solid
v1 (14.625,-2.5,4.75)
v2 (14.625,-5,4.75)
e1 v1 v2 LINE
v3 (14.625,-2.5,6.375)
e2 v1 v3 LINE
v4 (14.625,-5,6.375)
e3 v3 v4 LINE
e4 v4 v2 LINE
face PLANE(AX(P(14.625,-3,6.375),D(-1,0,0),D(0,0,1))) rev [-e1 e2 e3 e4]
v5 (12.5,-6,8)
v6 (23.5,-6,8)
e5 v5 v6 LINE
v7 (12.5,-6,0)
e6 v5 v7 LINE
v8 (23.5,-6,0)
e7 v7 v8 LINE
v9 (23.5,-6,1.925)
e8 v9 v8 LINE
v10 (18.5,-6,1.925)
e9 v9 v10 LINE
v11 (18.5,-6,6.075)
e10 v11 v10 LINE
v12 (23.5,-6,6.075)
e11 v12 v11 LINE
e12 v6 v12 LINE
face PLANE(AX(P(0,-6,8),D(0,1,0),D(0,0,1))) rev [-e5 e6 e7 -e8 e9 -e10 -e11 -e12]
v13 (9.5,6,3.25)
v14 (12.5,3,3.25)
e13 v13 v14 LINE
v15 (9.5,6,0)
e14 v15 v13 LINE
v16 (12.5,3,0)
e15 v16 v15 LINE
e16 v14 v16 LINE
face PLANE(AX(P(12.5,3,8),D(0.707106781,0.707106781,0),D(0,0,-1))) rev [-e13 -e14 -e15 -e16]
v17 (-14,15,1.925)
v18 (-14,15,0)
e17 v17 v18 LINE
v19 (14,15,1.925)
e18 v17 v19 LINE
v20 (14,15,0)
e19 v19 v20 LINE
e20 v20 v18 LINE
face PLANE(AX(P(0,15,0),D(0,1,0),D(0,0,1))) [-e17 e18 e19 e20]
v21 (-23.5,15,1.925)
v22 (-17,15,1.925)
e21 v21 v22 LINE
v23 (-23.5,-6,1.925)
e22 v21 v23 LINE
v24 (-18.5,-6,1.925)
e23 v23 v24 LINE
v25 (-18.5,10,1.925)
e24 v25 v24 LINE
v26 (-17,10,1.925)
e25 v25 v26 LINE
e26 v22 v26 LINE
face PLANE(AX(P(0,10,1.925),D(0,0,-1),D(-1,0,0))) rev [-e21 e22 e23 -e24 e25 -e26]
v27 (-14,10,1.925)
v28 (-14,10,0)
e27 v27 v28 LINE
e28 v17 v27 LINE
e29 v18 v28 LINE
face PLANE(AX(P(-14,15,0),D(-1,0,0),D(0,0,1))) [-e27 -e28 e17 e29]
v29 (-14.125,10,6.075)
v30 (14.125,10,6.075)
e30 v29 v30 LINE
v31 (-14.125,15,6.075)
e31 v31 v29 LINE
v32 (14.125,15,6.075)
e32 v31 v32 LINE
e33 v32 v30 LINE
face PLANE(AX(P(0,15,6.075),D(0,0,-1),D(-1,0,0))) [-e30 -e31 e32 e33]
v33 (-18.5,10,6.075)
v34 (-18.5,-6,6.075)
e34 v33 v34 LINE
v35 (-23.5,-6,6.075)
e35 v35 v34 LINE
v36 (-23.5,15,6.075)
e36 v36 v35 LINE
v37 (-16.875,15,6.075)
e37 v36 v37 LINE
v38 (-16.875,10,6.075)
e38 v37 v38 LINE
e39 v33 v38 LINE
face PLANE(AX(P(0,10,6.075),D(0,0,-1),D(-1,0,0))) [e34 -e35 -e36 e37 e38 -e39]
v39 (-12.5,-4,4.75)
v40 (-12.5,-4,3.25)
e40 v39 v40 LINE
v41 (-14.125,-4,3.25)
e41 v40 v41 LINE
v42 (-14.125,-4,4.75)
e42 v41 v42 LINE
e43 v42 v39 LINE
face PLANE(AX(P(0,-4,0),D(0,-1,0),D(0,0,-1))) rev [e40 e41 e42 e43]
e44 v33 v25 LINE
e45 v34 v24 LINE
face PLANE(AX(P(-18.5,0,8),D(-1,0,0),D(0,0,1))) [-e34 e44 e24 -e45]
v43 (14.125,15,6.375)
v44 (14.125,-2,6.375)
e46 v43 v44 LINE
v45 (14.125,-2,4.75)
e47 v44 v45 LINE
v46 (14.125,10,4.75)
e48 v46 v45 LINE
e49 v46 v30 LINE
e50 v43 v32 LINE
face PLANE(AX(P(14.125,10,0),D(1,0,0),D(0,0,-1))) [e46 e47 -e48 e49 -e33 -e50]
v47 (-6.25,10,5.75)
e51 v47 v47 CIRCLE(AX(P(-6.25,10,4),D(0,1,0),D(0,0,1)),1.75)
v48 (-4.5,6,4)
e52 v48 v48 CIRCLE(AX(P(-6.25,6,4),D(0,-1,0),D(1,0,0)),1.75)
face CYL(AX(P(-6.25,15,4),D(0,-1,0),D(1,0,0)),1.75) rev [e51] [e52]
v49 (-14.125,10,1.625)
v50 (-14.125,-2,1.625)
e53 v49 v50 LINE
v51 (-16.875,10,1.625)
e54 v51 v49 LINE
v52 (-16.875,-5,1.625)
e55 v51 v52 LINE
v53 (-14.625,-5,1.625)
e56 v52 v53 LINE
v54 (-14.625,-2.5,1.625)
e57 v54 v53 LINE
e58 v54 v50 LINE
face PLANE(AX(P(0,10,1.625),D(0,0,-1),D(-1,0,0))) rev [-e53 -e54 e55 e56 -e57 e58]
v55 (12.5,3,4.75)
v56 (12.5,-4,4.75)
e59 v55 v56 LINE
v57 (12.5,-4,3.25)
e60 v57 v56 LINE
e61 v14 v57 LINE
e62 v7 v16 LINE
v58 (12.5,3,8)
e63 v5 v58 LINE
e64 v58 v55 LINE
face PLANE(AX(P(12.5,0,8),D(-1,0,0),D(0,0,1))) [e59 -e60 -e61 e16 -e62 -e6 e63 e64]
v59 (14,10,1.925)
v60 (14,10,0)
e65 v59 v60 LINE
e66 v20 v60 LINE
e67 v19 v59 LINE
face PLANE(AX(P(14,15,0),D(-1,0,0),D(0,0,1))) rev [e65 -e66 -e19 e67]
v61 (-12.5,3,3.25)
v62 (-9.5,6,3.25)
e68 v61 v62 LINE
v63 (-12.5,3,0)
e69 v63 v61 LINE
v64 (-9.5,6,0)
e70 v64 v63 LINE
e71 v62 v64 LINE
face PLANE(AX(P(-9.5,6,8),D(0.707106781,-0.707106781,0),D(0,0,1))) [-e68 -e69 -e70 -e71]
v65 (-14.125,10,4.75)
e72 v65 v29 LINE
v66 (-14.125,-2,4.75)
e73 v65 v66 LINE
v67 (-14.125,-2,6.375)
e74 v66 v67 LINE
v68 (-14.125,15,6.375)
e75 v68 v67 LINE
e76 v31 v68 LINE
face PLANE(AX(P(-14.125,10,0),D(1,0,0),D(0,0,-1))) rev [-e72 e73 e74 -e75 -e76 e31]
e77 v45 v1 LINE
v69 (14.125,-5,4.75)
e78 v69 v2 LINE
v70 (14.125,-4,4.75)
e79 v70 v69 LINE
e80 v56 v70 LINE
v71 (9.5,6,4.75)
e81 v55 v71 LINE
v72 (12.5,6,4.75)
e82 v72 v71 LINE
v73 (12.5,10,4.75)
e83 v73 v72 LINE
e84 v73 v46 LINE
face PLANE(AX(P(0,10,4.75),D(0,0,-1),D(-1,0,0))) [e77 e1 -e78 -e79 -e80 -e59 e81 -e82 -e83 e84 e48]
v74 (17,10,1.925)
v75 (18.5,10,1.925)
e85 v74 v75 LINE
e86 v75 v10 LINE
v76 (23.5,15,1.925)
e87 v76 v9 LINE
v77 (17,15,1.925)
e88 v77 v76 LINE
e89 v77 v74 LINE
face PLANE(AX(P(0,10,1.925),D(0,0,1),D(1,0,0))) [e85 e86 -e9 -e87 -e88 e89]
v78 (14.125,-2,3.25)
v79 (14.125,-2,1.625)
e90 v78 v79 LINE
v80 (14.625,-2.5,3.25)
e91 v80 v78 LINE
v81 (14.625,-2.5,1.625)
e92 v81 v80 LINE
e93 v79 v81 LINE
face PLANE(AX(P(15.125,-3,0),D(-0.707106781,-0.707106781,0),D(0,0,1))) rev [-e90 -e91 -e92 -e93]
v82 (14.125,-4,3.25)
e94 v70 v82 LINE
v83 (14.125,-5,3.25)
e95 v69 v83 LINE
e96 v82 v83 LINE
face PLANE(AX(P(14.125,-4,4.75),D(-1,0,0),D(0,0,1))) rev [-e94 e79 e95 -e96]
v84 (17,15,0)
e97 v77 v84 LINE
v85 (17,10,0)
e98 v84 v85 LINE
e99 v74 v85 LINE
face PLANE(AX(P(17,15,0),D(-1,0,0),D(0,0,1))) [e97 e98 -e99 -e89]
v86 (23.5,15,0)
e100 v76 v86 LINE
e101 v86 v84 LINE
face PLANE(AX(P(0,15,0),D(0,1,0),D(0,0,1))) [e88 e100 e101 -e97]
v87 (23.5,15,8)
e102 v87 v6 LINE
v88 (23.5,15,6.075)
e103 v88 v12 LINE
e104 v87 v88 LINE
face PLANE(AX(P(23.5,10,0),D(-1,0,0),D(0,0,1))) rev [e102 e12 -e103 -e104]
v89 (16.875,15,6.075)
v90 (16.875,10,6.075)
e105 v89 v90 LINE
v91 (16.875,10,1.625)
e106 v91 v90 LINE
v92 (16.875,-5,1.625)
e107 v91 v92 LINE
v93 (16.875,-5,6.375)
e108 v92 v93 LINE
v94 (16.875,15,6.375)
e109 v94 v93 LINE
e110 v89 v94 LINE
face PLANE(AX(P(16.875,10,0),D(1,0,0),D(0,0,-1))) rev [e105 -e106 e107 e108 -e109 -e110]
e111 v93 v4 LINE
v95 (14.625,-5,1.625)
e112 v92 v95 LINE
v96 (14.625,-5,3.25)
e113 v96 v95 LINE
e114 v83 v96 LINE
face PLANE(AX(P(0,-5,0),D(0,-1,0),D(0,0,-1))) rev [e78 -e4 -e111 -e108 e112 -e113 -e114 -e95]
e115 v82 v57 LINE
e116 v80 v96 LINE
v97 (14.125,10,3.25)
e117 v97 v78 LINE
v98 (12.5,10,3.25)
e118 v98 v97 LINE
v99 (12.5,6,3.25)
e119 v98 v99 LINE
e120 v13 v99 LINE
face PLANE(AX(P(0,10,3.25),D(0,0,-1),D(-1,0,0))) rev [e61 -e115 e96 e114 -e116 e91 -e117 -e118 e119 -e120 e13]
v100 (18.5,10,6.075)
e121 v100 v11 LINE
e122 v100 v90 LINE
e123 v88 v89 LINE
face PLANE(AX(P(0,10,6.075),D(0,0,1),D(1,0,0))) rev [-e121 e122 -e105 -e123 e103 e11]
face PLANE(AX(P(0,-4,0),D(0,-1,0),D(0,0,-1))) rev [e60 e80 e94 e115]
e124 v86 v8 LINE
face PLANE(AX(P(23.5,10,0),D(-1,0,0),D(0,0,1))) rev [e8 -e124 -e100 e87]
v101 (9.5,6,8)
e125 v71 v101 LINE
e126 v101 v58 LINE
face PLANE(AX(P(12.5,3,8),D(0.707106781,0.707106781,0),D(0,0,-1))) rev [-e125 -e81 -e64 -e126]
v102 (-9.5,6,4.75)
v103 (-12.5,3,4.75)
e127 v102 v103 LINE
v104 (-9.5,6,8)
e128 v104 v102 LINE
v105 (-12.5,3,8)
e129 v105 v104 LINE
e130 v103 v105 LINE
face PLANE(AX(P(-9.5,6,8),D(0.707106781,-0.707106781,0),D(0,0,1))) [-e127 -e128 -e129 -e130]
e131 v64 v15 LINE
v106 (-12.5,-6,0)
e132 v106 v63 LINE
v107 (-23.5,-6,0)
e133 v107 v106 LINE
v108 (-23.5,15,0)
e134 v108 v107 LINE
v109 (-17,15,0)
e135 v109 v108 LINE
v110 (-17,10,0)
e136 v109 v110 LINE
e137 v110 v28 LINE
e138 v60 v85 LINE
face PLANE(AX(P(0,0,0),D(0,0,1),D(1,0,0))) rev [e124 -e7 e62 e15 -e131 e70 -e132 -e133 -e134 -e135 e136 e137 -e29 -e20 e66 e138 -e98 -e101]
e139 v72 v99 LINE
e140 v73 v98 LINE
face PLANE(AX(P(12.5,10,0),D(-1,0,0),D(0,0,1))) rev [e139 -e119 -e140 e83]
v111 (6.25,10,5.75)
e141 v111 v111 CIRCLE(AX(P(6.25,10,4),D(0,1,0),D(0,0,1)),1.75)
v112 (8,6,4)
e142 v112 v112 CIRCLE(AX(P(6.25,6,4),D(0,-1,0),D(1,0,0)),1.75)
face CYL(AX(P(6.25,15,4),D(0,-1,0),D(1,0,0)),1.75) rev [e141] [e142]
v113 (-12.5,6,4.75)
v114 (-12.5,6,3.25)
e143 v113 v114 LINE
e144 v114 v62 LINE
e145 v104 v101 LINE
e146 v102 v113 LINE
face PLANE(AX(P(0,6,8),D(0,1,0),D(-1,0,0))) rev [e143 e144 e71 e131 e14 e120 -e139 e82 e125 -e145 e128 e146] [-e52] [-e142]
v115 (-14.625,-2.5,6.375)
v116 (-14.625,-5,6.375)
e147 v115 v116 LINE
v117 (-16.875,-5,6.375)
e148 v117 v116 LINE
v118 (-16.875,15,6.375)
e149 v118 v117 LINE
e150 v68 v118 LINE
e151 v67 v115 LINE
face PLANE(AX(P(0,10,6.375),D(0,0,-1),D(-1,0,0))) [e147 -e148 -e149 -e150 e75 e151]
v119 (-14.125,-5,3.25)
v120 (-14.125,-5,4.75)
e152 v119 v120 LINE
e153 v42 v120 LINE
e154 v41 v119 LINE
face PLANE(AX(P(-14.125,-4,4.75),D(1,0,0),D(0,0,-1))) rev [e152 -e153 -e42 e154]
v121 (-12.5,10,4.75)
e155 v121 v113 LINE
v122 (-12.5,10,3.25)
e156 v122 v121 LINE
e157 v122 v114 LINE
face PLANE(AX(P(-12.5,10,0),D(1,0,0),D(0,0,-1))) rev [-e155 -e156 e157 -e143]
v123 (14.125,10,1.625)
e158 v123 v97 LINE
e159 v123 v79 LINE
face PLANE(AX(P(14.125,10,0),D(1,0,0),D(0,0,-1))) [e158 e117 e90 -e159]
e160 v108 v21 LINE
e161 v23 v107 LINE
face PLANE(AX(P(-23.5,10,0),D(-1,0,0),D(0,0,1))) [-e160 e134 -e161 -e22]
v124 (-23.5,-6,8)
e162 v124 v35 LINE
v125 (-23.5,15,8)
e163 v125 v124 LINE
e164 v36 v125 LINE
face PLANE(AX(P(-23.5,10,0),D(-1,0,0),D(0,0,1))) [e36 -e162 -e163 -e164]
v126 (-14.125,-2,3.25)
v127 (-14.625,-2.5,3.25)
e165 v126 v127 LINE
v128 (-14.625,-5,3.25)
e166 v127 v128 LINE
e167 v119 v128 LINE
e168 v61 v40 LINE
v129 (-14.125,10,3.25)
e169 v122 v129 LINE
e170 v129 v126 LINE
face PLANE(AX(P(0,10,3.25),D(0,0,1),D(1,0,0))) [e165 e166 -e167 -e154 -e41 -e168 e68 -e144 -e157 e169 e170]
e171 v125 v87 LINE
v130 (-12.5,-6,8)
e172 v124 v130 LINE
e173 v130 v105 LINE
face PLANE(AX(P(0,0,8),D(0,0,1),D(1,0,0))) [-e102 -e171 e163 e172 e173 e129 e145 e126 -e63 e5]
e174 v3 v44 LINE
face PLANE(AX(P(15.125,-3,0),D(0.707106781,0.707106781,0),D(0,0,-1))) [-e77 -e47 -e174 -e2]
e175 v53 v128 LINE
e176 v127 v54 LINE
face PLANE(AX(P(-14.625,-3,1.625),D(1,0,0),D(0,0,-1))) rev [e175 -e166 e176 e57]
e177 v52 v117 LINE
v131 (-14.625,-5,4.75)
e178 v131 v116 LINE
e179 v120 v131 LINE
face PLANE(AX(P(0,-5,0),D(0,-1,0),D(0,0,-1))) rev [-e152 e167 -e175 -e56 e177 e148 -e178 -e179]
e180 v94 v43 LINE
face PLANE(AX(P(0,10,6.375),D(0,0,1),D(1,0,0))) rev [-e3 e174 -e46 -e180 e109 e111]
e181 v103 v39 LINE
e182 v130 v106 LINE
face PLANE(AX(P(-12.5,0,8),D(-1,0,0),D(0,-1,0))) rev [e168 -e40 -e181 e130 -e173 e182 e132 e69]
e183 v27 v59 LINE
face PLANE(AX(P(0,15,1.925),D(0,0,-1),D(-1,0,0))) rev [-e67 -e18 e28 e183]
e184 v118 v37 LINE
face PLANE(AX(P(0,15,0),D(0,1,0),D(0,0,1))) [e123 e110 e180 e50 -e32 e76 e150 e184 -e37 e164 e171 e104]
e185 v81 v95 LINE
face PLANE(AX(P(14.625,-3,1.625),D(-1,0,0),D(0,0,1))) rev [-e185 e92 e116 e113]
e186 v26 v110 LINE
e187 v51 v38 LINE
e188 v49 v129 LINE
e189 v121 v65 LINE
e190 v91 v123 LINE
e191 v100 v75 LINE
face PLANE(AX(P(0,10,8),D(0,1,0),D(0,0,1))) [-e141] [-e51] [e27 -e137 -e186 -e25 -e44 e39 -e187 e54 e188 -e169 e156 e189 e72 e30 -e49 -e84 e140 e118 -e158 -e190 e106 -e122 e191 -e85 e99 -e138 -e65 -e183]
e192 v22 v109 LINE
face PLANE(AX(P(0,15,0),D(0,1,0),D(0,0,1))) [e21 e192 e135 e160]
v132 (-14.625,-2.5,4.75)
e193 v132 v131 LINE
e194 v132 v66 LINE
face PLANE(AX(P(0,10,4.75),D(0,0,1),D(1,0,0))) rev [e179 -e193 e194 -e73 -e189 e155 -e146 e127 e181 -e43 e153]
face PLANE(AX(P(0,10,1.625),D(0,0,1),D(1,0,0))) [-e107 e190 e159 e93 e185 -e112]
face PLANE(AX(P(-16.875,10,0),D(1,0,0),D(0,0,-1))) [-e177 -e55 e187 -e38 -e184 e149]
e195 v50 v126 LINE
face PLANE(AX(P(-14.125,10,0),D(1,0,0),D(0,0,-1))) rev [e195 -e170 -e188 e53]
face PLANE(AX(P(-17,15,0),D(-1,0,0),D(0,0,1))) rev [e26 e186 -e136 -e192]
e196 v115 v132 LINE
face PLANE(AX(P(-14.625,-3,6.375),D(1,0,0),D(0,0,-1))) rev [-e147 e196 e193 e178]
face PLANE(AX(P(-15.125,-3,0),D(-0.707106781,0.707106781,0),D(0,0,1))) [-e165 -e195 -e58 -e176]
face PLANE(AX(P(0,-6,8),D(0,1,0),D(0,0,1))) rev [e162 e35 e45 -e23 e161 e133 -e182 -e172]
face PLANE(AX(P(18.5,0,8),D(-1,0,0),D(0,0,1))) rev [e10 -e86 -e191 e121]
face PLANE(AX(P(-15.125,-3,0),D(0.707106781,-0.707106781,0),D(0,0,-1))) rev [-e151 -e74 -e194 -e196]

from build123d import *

# Parameters (mm, degrees)
EXTRUDE_1_DEPTH     = 8
CUT_EXTRUDE_START   = -1
SKETCH_2_W          = 2.75
SKETCH_2_H          = 4.75
SKETCH_2_W_2        = 1.625
SKETCH_2_H_2        = 1.5
CUT_EXTRUDE_1_DEPTH = 25.734218465
SKETCH_3_W          = 0.5
SKETCH_3_H          = 1.625
EXTRUDE_2_DEPTH     = 2
CHAMFER_1_SIZE      = 1
SKETCH_4_W          = 1.625
SKETCH_4_H          = 1.5
EXTRUDE_3_DEPTH     = 1
CHAMFER_2_SIZE      = 3
SKETCH_5_W          = 5
SKETCH_5_H          = 1.925
EXTRUDE_4_DEPTH     = 16
SKETCH_6_W          = 6.5
SKETCH_6_H          = 1.925
SKETCH_6_W_2        = 28
EXTRUDE_5_DEPTH     = 5
SKETCH_7_R          = 1.75
CUT_EXTRUDE_2_DEPTH = 28.572631358


with BuildPart() as part:
    # Эскиз1 → Бобышка-Вытянуть1 (new body)
    with BuildSketch(Plane.XY):
        Polygon((-18.5, -6), (-12.5, -6), (-12.5, 6), (12.5, 6), (12.5, -6), (18.5, -6), (18.5, 10), (-18.5, 10), align=None)
    extrude(amount=EXTRUDE_1_DEPTH)

    # Эскиз2 → Вырез-Вытянуть1 (cut, through all)
    with BuildSketch(Plane.XZ.offset(6).offset(CUT_EXTRUDE_START)):
        with Locations((15.5, 4)):
            Rectangle(SKETCH_2_W, SKETCH_2_H)
        with Locations((13.3125, 4)):
            Rectangle(SKETCH_2_W_2, SKETCH_2_H_2)
        with Locations((-13.3125, 4)):
            Rectangle(SKETCH_2_W_2, SKETCH_2_H_2)
        Polygon((-14.125, 1.625), (-14.125, 3.25), (-14.125, 4.75), (-14.125, 6.375), (-16.875, 6.375), (-16.875, 1.625), align=None)
    extrude(amount=-CUT_EXTRUDE_1_DEPTH, mode=Mode.SUBTRACT)

    # Эскиз3 → Бобышка-Вытянуть2 (add)
    with BuildSketch(Plane(origin=(0, -5, 0), x_dir=(1, 0, 0), z_dir=(0, 1, 0))):
        with Locations((-14.375, -2.4375)):
            Rectangle(SKETCH_3_W, SKETCH_3_H)
        with Locations((-14.375, -5.5625)):
            Rectangle(SKETCH_3_W, SKETCH_3_H)
        with Locations((14.375, -5.5625)):
            Rectangle(SKETCH_3_W, SKETCH_3_H)
        with Locations((14.375, -2.4375)):
            Rectangle(SKETCH_3_W, SKETCH_3_H)
    extrude(amount=EXTRUDE_2_DEPTH)

    # Фаска1
    # the kernel refuses this chamfer: 1 mm, written as the material it adds along each edge
    with BuildSketch(Plane(origin=(-14.125, -3, 2.178317012), x_dir=(0.02749587661058563, 0.9996219169112968, 0), z_dir=(0, 0, 1))) as chamfer_1_piece_1_section:
        Polygon((CHAMFER_1_SIZE * 0.999621916911, CHAMFER_1_SIZE * 0.0274958766106), (-CHAMFER_1_SIZE * 0.0274958766106, CHAMFER_1_SIZE * 0.999621916911), (0, 0), align=None)
    chamfer_1_piece_1 = extrude(amount=6.768365976, mode=Mode.PRIVATE)
    chamfer_1_piece_1 = split(chamfer_1_piece_1, bisect_by=Plane(origin=(-14.625, -2.611111111, 2.714158506), z_dir=(1, 0, 0)), keep=Keep.TOP, mode=Mode.PRIVATE)
    chamfer_1_piece_1 = split(chamfer_1_piece_1, bisect_by=Plane(origin=(-14.347222222, -2.611111111, 3.25), z_dir=(0, 0, -1)), keep=Keep.TOP, mode=Mode.PRIVATE)
    add(chamfer_1_piece_1)
    with BuildSketch(Plane(origin=(-14.125, -3, 4.75), x_dir=(0.027495876610583895, 0.9996219169112968, 0), z_dir=(0, 0, 1))) as chamfer_1_piece_2_section:
        Polygon((CHAMFER_1_SIZE * 0.999621916911, CHAMFER_1_SIZE * 0.0274958766106), (-CHAMFER_1_SIZE * 0.0274958766106, CHAMFER_1_SIZE * 0.999621916911), (0, 0), align=None)
    chamfer_1_piece_2 = extrude(amount=1.625, mode=Mode.PRIVATE)
    chamfer_1_piece_2 = split(chamfer_1_piece_2, bisect_by=Plane(origin=(-14.625, -2.611111111, 5.5625), z_dir=(1, 0, 0)), keep=Keep.TOP, mode=Mode.PRIVATE)
    add(chamfer_1_piece_2)
    with BuildSketch(Plane(origin=(14.125, -3, 2.178317012), x_dir=(0.9996219169112968, -0.02749587661058651, -1.092729371642936e-15), z_dir=(0, 0, 1))) as chamfer_1_piece_3_section:
        Polygon((CHAMFER_1_SIZE * 0.999621916911, CHAMFER_1_SIZE * 0.0274958766106), (-CHAMFER_1_SIZE * 0.0274958766106, CHAMFER_1_SIZE * 0.999621916911), (0, 0), align=None)
    chamfer_1_piece_3 = extrude(amount=6.768365976, mode=Mode.PRIVATE)
    chamfer_1_piece_3 = split(chamfer_1_piece_3, bisect_by=Plane(origin=(14.347222222, -2.611111111, 3.25), z_dir=(0, 0, -1)), keep=Keep.TOP, mode=Mode.PRIVATE)
    chamfer_1_piece_3 = split(chamfer_1_piece_3, bisect_by=Plane(origin=(14.625, -2.611111111, 2.714158506), z_dir=(-1, 0, 0)), keep=Keep.TOP, mode=Mode.PRIVATE)
    add(chamfer_1_piece_3)
    with BuildSketch(Plane(origin=(14.125, -3, 4.75), x_dir=(0.9996219169112968, -0.02749587661058651, -1.092729371642936e-15), z_dir=(0, 0, 1))) as chamfer_1_piece_4_section:
        Polygon((CHAMFER_1_SIZE * 0.999621916911, CHAMFER_1_SIZE * 0.0274958766106), (-CHAMFER_1_SIZE * 0.0274958766106, CHAMFER_1_SIZE * 0.999621916911), (0, 0), align=None)
    chamfer_1_piece_4 = extrude(amount=1.625, mode=Mode.PRIVATE)
    chamfer_1_piece_4 = split(chamfer_1_piece_4, bisect_by=Plane(origin=(14.625, -2.611111111, 5.5625), z_dir=(-1, 0, 0)), keep=Keep.TOP, mode=Mode.PRIVATE)
    add(chamfer_1_piece_4)
    with BuildSketch(Plane(origin=(14.125, -3, 5.821682988), x_dir=(0.9996219169112968, -0.02749587661058651, 0), z_dir=(0, 0, -1))) as chamfer_1_piece_5_section:
        Polygon((CHAMFER_1_SIZE * 0.999621916911, -CHAMFER_1_SIZE * 0.0274958766106), (-CHAMFER_1_SIZE * 0.0274958766106, -CHAMFER_1_SIZE * 0.999621916911), (0, 0), align=None)
    chamfer_1_piece_5 = extrude(amount=6.768365976, mode=Mode.PRIVATE)
    chamfer_1_piece_5 = split(chamfer_1_piece_5, bisect_by=Plane(origin=(14.625, -2.611111111, 5.285841494), z_dir=(-1, 0, 0)), keep=Keep.TOP, mode=Mode.PRIVATE)
    chamfer_1_piece_5 = split(chamfer_1_piece_5, bisect_by=Plane(origin=(14.347222222, -2.611111111, 4.75), z_dir=(0, 0, 1)), keep=Keep.TOP, mode=Mode.PRIVATE)
    add(chamfer_1_piece_5)
    with BuildSketch(Plane(origin=(14.125, -3, 3.25), x_dir=(0.9996219169112968, -0.02749587661058651, 0), z_dir=(0, 0, -1))) as chamfer_1_piece_6_section:
        Polygon((CHAMFER_1_SIZE * 0.999621916911, -CHAMFER_1_SIZE * 0.0274958766106), (-CHAMFER_1_SIZE * 0.0274958766106, -CHAMFER_1_SIZE * 0.999621916911), (0, 0), align=None)
    chamfer_1_piece_6 = extrude(amount=4.196682988, mode=Mode.PRIVATE)
    chamfer_1_piece_6 = split(chamfer_1_piece_6, bisect_by=Plane(origin=(14.625, -2.611111111, 2.4375), z_dir=(-1, 0, 0)), keep=Keep.TOP, mode=Mode.PRIVATE)
    chamfer_1_piece_6 = split(chamfer_1_piece_6, bisect_by=Plane(origin=(14.347222222, -2.611111111, 0), z_dir=(0, 0, 1)), keep=Keep.TOP, mode=Mode.PRIVATE)
    add(chamfer_1_piece_6)
    with BuildSketch(Plane(origin=(-14.125, -3, 5.821682988), x_dir=(0.02749587661058563, 0.9996219169112968, 0), z_dir=(0, 0, -1))) as chamfer_1_piece_7_section:
        Polygon((CHAMFER_1_SIZE * 0.999621916911, -CHAMFER_1_SIZE * 0.0274958766106), (-CHAMFER_1_SIZE * 0.0274958766106, -CHAMFER_1_SIZE * 0.999621916911), (0, 0), align=None)
    chamfer_1_piece_7 = extrude(amount=6.768365976, mode=Mode.PRIVATE)
    chamfer_1_piece_7 = split(chamfer_1_piece_7, bisect_by=Plane(origin=(-14.347222222, -2.611111111, 4.75), z_dir=(0, 0, 1)), keep=Keep.TOP, mode=Mode.PRIVATE)
    chamfer_1_piece_7 = split(chamfer_1_piece_7, bisect_by=Plane(origin=(-14.625, -2.611111111, 5.285841494), z_dir=(1, 0, 0)), keep=Keep.TOP, mode=Mode.PRIVATE)
    add(chamfer_1_piece_7)
    with BuildSketch(Plane(origin=(-14.125, -3, 3.25), x_dir=(0.02749587661058563, 0.9996219169112968, 0), z_dir=(0, 0, -1))) as chamfer_1_piece_8_section:
        Polygon((CHAMFER_1_SIZE * 0.999621916911, -CHAMFER_1_SIZE * 0.0274958766106), (-CHAMFER_1_SIZE * 0.0274958766106, -CHAMFER_1_SIZE * 0.999621916911), (0, 0), align=None)
    chamfer_1_piece_8 = extrude(amount=4.196682988, mode=Mode.PRIVATE)
    chamfer_1_piece_8 = split(chamfer_1_piece_8, bisect_by=Plane(origin=(-14.625, -2.611111111, 2.4375), z_dir=(1, 0, 0)), keep=Keep.TOP, mode=Mode.PRIVATE)
    chamfer_1_piece_8 = split(chamfer_1_piece_8, bisect_by=Plane(origin=(-14.347222222, -2.611111111, 0), z_dir=(0, 0, 1)), keep=Keep.TOP, mode=Mode.PRIVATE)
    add(chamfer_1_piece_8)

    # Эскиз4 → Бобышка-Вытянуть3 (add)
    with BuildSketch(Plane(origin=(0, -5, 0), x_dir=(1, 0, 0), z_dir=(0, 1, 0))):
        with Locations((-13.3125, -4)):
            Rectangle(SKETCH_4_W, SKETCH_4_H)
        with Locations((13.3125, -4)):
            Rectangle(SKETCH_4_W, SKETCH_4_H)
    extrude(amount=EXTRUDE_3_DEPTH)

    # Фаска2
    chamfer_2_edges = [part.edges().sort_by_distance(p)[0] for p in [
        (12.5, 6, 6.375),
        (-12.5, 6, 6.375),
        (12.5, 6, 1.625),
        (-12.5, 6, 1.625),
    ]]
    chamfer(chamfer_2_edges, length=CHAMFER_2_SIZE)

    # Эскиз5 → Бобышка-Вытянуть4 (add, through all)
    with BuildSketch(Plane.XZ.offset(6)):
        with Locations((-21, 7.0375)):
            Rectangle(SKETCH_5_W, SKETCH_5_H)
        with Locations((-21, 0.9625)):
            Rectangle(SKETCH_5_W, SKETCH_5_H)
        with Locations((21, 7.0375)):
            Rectangle(SKETCH_5_W, SKETCH_5_H)
        with Locations((21, 0.9625)):
            Rectangle(SKETCH_5_W, SKETCH_5_H)
    extrude(amount=-EXTRUDE_4_DEPTH)

    # Эскиз6 → Бобышка-Вытянуть5 (add)
    with BuildSketch(Plane(origin=(0, 10, 0), x_dir=(1, 0, 0), z_dir=(0, 1, 0))):
        with Locations((-20.25, -0.9625)):
            Rectangle(SKETCH_6_W, SKETCH_6_H)
        with Locations((0, -0.9625)):
            Rectangle(SKETCH_6_W_2, SKETCH_6_H)
        with Locations((20.25, -0.9625)):
            Rectangle(SKETCH_6_W, SKETCH_6_H)
        Polygon((-16.875, -6.375), (-16.875, -6.075), (-23.5, -6.075), (-23.5, -8), (23.5, -8), (23.5, -6.075), (16.875, -6.075), (16.875, -6.375), (14.125, -6.375), (14.125, -6.075), (-14.125, -6.075), (-14.125, -6.375), align=None)
    extrude(amount=EXTRUDE_5_DEPTH)

    # Эскиз7 → Вырез-Вытянуть2 (cut, through all)
    with BuildSketch(Plane.XZ.offset(-6)):
        with Locations((-6.25, 4)):
            Circle(SKETCH_7_R)
        with Locations((6.25, 4)):
            Circle(SKETCH_7_R)
    extrude(amount=-CUT_EXTRUDE_2_DEPTH, mode=Mode.SUBTRACT)


solid = part.part
